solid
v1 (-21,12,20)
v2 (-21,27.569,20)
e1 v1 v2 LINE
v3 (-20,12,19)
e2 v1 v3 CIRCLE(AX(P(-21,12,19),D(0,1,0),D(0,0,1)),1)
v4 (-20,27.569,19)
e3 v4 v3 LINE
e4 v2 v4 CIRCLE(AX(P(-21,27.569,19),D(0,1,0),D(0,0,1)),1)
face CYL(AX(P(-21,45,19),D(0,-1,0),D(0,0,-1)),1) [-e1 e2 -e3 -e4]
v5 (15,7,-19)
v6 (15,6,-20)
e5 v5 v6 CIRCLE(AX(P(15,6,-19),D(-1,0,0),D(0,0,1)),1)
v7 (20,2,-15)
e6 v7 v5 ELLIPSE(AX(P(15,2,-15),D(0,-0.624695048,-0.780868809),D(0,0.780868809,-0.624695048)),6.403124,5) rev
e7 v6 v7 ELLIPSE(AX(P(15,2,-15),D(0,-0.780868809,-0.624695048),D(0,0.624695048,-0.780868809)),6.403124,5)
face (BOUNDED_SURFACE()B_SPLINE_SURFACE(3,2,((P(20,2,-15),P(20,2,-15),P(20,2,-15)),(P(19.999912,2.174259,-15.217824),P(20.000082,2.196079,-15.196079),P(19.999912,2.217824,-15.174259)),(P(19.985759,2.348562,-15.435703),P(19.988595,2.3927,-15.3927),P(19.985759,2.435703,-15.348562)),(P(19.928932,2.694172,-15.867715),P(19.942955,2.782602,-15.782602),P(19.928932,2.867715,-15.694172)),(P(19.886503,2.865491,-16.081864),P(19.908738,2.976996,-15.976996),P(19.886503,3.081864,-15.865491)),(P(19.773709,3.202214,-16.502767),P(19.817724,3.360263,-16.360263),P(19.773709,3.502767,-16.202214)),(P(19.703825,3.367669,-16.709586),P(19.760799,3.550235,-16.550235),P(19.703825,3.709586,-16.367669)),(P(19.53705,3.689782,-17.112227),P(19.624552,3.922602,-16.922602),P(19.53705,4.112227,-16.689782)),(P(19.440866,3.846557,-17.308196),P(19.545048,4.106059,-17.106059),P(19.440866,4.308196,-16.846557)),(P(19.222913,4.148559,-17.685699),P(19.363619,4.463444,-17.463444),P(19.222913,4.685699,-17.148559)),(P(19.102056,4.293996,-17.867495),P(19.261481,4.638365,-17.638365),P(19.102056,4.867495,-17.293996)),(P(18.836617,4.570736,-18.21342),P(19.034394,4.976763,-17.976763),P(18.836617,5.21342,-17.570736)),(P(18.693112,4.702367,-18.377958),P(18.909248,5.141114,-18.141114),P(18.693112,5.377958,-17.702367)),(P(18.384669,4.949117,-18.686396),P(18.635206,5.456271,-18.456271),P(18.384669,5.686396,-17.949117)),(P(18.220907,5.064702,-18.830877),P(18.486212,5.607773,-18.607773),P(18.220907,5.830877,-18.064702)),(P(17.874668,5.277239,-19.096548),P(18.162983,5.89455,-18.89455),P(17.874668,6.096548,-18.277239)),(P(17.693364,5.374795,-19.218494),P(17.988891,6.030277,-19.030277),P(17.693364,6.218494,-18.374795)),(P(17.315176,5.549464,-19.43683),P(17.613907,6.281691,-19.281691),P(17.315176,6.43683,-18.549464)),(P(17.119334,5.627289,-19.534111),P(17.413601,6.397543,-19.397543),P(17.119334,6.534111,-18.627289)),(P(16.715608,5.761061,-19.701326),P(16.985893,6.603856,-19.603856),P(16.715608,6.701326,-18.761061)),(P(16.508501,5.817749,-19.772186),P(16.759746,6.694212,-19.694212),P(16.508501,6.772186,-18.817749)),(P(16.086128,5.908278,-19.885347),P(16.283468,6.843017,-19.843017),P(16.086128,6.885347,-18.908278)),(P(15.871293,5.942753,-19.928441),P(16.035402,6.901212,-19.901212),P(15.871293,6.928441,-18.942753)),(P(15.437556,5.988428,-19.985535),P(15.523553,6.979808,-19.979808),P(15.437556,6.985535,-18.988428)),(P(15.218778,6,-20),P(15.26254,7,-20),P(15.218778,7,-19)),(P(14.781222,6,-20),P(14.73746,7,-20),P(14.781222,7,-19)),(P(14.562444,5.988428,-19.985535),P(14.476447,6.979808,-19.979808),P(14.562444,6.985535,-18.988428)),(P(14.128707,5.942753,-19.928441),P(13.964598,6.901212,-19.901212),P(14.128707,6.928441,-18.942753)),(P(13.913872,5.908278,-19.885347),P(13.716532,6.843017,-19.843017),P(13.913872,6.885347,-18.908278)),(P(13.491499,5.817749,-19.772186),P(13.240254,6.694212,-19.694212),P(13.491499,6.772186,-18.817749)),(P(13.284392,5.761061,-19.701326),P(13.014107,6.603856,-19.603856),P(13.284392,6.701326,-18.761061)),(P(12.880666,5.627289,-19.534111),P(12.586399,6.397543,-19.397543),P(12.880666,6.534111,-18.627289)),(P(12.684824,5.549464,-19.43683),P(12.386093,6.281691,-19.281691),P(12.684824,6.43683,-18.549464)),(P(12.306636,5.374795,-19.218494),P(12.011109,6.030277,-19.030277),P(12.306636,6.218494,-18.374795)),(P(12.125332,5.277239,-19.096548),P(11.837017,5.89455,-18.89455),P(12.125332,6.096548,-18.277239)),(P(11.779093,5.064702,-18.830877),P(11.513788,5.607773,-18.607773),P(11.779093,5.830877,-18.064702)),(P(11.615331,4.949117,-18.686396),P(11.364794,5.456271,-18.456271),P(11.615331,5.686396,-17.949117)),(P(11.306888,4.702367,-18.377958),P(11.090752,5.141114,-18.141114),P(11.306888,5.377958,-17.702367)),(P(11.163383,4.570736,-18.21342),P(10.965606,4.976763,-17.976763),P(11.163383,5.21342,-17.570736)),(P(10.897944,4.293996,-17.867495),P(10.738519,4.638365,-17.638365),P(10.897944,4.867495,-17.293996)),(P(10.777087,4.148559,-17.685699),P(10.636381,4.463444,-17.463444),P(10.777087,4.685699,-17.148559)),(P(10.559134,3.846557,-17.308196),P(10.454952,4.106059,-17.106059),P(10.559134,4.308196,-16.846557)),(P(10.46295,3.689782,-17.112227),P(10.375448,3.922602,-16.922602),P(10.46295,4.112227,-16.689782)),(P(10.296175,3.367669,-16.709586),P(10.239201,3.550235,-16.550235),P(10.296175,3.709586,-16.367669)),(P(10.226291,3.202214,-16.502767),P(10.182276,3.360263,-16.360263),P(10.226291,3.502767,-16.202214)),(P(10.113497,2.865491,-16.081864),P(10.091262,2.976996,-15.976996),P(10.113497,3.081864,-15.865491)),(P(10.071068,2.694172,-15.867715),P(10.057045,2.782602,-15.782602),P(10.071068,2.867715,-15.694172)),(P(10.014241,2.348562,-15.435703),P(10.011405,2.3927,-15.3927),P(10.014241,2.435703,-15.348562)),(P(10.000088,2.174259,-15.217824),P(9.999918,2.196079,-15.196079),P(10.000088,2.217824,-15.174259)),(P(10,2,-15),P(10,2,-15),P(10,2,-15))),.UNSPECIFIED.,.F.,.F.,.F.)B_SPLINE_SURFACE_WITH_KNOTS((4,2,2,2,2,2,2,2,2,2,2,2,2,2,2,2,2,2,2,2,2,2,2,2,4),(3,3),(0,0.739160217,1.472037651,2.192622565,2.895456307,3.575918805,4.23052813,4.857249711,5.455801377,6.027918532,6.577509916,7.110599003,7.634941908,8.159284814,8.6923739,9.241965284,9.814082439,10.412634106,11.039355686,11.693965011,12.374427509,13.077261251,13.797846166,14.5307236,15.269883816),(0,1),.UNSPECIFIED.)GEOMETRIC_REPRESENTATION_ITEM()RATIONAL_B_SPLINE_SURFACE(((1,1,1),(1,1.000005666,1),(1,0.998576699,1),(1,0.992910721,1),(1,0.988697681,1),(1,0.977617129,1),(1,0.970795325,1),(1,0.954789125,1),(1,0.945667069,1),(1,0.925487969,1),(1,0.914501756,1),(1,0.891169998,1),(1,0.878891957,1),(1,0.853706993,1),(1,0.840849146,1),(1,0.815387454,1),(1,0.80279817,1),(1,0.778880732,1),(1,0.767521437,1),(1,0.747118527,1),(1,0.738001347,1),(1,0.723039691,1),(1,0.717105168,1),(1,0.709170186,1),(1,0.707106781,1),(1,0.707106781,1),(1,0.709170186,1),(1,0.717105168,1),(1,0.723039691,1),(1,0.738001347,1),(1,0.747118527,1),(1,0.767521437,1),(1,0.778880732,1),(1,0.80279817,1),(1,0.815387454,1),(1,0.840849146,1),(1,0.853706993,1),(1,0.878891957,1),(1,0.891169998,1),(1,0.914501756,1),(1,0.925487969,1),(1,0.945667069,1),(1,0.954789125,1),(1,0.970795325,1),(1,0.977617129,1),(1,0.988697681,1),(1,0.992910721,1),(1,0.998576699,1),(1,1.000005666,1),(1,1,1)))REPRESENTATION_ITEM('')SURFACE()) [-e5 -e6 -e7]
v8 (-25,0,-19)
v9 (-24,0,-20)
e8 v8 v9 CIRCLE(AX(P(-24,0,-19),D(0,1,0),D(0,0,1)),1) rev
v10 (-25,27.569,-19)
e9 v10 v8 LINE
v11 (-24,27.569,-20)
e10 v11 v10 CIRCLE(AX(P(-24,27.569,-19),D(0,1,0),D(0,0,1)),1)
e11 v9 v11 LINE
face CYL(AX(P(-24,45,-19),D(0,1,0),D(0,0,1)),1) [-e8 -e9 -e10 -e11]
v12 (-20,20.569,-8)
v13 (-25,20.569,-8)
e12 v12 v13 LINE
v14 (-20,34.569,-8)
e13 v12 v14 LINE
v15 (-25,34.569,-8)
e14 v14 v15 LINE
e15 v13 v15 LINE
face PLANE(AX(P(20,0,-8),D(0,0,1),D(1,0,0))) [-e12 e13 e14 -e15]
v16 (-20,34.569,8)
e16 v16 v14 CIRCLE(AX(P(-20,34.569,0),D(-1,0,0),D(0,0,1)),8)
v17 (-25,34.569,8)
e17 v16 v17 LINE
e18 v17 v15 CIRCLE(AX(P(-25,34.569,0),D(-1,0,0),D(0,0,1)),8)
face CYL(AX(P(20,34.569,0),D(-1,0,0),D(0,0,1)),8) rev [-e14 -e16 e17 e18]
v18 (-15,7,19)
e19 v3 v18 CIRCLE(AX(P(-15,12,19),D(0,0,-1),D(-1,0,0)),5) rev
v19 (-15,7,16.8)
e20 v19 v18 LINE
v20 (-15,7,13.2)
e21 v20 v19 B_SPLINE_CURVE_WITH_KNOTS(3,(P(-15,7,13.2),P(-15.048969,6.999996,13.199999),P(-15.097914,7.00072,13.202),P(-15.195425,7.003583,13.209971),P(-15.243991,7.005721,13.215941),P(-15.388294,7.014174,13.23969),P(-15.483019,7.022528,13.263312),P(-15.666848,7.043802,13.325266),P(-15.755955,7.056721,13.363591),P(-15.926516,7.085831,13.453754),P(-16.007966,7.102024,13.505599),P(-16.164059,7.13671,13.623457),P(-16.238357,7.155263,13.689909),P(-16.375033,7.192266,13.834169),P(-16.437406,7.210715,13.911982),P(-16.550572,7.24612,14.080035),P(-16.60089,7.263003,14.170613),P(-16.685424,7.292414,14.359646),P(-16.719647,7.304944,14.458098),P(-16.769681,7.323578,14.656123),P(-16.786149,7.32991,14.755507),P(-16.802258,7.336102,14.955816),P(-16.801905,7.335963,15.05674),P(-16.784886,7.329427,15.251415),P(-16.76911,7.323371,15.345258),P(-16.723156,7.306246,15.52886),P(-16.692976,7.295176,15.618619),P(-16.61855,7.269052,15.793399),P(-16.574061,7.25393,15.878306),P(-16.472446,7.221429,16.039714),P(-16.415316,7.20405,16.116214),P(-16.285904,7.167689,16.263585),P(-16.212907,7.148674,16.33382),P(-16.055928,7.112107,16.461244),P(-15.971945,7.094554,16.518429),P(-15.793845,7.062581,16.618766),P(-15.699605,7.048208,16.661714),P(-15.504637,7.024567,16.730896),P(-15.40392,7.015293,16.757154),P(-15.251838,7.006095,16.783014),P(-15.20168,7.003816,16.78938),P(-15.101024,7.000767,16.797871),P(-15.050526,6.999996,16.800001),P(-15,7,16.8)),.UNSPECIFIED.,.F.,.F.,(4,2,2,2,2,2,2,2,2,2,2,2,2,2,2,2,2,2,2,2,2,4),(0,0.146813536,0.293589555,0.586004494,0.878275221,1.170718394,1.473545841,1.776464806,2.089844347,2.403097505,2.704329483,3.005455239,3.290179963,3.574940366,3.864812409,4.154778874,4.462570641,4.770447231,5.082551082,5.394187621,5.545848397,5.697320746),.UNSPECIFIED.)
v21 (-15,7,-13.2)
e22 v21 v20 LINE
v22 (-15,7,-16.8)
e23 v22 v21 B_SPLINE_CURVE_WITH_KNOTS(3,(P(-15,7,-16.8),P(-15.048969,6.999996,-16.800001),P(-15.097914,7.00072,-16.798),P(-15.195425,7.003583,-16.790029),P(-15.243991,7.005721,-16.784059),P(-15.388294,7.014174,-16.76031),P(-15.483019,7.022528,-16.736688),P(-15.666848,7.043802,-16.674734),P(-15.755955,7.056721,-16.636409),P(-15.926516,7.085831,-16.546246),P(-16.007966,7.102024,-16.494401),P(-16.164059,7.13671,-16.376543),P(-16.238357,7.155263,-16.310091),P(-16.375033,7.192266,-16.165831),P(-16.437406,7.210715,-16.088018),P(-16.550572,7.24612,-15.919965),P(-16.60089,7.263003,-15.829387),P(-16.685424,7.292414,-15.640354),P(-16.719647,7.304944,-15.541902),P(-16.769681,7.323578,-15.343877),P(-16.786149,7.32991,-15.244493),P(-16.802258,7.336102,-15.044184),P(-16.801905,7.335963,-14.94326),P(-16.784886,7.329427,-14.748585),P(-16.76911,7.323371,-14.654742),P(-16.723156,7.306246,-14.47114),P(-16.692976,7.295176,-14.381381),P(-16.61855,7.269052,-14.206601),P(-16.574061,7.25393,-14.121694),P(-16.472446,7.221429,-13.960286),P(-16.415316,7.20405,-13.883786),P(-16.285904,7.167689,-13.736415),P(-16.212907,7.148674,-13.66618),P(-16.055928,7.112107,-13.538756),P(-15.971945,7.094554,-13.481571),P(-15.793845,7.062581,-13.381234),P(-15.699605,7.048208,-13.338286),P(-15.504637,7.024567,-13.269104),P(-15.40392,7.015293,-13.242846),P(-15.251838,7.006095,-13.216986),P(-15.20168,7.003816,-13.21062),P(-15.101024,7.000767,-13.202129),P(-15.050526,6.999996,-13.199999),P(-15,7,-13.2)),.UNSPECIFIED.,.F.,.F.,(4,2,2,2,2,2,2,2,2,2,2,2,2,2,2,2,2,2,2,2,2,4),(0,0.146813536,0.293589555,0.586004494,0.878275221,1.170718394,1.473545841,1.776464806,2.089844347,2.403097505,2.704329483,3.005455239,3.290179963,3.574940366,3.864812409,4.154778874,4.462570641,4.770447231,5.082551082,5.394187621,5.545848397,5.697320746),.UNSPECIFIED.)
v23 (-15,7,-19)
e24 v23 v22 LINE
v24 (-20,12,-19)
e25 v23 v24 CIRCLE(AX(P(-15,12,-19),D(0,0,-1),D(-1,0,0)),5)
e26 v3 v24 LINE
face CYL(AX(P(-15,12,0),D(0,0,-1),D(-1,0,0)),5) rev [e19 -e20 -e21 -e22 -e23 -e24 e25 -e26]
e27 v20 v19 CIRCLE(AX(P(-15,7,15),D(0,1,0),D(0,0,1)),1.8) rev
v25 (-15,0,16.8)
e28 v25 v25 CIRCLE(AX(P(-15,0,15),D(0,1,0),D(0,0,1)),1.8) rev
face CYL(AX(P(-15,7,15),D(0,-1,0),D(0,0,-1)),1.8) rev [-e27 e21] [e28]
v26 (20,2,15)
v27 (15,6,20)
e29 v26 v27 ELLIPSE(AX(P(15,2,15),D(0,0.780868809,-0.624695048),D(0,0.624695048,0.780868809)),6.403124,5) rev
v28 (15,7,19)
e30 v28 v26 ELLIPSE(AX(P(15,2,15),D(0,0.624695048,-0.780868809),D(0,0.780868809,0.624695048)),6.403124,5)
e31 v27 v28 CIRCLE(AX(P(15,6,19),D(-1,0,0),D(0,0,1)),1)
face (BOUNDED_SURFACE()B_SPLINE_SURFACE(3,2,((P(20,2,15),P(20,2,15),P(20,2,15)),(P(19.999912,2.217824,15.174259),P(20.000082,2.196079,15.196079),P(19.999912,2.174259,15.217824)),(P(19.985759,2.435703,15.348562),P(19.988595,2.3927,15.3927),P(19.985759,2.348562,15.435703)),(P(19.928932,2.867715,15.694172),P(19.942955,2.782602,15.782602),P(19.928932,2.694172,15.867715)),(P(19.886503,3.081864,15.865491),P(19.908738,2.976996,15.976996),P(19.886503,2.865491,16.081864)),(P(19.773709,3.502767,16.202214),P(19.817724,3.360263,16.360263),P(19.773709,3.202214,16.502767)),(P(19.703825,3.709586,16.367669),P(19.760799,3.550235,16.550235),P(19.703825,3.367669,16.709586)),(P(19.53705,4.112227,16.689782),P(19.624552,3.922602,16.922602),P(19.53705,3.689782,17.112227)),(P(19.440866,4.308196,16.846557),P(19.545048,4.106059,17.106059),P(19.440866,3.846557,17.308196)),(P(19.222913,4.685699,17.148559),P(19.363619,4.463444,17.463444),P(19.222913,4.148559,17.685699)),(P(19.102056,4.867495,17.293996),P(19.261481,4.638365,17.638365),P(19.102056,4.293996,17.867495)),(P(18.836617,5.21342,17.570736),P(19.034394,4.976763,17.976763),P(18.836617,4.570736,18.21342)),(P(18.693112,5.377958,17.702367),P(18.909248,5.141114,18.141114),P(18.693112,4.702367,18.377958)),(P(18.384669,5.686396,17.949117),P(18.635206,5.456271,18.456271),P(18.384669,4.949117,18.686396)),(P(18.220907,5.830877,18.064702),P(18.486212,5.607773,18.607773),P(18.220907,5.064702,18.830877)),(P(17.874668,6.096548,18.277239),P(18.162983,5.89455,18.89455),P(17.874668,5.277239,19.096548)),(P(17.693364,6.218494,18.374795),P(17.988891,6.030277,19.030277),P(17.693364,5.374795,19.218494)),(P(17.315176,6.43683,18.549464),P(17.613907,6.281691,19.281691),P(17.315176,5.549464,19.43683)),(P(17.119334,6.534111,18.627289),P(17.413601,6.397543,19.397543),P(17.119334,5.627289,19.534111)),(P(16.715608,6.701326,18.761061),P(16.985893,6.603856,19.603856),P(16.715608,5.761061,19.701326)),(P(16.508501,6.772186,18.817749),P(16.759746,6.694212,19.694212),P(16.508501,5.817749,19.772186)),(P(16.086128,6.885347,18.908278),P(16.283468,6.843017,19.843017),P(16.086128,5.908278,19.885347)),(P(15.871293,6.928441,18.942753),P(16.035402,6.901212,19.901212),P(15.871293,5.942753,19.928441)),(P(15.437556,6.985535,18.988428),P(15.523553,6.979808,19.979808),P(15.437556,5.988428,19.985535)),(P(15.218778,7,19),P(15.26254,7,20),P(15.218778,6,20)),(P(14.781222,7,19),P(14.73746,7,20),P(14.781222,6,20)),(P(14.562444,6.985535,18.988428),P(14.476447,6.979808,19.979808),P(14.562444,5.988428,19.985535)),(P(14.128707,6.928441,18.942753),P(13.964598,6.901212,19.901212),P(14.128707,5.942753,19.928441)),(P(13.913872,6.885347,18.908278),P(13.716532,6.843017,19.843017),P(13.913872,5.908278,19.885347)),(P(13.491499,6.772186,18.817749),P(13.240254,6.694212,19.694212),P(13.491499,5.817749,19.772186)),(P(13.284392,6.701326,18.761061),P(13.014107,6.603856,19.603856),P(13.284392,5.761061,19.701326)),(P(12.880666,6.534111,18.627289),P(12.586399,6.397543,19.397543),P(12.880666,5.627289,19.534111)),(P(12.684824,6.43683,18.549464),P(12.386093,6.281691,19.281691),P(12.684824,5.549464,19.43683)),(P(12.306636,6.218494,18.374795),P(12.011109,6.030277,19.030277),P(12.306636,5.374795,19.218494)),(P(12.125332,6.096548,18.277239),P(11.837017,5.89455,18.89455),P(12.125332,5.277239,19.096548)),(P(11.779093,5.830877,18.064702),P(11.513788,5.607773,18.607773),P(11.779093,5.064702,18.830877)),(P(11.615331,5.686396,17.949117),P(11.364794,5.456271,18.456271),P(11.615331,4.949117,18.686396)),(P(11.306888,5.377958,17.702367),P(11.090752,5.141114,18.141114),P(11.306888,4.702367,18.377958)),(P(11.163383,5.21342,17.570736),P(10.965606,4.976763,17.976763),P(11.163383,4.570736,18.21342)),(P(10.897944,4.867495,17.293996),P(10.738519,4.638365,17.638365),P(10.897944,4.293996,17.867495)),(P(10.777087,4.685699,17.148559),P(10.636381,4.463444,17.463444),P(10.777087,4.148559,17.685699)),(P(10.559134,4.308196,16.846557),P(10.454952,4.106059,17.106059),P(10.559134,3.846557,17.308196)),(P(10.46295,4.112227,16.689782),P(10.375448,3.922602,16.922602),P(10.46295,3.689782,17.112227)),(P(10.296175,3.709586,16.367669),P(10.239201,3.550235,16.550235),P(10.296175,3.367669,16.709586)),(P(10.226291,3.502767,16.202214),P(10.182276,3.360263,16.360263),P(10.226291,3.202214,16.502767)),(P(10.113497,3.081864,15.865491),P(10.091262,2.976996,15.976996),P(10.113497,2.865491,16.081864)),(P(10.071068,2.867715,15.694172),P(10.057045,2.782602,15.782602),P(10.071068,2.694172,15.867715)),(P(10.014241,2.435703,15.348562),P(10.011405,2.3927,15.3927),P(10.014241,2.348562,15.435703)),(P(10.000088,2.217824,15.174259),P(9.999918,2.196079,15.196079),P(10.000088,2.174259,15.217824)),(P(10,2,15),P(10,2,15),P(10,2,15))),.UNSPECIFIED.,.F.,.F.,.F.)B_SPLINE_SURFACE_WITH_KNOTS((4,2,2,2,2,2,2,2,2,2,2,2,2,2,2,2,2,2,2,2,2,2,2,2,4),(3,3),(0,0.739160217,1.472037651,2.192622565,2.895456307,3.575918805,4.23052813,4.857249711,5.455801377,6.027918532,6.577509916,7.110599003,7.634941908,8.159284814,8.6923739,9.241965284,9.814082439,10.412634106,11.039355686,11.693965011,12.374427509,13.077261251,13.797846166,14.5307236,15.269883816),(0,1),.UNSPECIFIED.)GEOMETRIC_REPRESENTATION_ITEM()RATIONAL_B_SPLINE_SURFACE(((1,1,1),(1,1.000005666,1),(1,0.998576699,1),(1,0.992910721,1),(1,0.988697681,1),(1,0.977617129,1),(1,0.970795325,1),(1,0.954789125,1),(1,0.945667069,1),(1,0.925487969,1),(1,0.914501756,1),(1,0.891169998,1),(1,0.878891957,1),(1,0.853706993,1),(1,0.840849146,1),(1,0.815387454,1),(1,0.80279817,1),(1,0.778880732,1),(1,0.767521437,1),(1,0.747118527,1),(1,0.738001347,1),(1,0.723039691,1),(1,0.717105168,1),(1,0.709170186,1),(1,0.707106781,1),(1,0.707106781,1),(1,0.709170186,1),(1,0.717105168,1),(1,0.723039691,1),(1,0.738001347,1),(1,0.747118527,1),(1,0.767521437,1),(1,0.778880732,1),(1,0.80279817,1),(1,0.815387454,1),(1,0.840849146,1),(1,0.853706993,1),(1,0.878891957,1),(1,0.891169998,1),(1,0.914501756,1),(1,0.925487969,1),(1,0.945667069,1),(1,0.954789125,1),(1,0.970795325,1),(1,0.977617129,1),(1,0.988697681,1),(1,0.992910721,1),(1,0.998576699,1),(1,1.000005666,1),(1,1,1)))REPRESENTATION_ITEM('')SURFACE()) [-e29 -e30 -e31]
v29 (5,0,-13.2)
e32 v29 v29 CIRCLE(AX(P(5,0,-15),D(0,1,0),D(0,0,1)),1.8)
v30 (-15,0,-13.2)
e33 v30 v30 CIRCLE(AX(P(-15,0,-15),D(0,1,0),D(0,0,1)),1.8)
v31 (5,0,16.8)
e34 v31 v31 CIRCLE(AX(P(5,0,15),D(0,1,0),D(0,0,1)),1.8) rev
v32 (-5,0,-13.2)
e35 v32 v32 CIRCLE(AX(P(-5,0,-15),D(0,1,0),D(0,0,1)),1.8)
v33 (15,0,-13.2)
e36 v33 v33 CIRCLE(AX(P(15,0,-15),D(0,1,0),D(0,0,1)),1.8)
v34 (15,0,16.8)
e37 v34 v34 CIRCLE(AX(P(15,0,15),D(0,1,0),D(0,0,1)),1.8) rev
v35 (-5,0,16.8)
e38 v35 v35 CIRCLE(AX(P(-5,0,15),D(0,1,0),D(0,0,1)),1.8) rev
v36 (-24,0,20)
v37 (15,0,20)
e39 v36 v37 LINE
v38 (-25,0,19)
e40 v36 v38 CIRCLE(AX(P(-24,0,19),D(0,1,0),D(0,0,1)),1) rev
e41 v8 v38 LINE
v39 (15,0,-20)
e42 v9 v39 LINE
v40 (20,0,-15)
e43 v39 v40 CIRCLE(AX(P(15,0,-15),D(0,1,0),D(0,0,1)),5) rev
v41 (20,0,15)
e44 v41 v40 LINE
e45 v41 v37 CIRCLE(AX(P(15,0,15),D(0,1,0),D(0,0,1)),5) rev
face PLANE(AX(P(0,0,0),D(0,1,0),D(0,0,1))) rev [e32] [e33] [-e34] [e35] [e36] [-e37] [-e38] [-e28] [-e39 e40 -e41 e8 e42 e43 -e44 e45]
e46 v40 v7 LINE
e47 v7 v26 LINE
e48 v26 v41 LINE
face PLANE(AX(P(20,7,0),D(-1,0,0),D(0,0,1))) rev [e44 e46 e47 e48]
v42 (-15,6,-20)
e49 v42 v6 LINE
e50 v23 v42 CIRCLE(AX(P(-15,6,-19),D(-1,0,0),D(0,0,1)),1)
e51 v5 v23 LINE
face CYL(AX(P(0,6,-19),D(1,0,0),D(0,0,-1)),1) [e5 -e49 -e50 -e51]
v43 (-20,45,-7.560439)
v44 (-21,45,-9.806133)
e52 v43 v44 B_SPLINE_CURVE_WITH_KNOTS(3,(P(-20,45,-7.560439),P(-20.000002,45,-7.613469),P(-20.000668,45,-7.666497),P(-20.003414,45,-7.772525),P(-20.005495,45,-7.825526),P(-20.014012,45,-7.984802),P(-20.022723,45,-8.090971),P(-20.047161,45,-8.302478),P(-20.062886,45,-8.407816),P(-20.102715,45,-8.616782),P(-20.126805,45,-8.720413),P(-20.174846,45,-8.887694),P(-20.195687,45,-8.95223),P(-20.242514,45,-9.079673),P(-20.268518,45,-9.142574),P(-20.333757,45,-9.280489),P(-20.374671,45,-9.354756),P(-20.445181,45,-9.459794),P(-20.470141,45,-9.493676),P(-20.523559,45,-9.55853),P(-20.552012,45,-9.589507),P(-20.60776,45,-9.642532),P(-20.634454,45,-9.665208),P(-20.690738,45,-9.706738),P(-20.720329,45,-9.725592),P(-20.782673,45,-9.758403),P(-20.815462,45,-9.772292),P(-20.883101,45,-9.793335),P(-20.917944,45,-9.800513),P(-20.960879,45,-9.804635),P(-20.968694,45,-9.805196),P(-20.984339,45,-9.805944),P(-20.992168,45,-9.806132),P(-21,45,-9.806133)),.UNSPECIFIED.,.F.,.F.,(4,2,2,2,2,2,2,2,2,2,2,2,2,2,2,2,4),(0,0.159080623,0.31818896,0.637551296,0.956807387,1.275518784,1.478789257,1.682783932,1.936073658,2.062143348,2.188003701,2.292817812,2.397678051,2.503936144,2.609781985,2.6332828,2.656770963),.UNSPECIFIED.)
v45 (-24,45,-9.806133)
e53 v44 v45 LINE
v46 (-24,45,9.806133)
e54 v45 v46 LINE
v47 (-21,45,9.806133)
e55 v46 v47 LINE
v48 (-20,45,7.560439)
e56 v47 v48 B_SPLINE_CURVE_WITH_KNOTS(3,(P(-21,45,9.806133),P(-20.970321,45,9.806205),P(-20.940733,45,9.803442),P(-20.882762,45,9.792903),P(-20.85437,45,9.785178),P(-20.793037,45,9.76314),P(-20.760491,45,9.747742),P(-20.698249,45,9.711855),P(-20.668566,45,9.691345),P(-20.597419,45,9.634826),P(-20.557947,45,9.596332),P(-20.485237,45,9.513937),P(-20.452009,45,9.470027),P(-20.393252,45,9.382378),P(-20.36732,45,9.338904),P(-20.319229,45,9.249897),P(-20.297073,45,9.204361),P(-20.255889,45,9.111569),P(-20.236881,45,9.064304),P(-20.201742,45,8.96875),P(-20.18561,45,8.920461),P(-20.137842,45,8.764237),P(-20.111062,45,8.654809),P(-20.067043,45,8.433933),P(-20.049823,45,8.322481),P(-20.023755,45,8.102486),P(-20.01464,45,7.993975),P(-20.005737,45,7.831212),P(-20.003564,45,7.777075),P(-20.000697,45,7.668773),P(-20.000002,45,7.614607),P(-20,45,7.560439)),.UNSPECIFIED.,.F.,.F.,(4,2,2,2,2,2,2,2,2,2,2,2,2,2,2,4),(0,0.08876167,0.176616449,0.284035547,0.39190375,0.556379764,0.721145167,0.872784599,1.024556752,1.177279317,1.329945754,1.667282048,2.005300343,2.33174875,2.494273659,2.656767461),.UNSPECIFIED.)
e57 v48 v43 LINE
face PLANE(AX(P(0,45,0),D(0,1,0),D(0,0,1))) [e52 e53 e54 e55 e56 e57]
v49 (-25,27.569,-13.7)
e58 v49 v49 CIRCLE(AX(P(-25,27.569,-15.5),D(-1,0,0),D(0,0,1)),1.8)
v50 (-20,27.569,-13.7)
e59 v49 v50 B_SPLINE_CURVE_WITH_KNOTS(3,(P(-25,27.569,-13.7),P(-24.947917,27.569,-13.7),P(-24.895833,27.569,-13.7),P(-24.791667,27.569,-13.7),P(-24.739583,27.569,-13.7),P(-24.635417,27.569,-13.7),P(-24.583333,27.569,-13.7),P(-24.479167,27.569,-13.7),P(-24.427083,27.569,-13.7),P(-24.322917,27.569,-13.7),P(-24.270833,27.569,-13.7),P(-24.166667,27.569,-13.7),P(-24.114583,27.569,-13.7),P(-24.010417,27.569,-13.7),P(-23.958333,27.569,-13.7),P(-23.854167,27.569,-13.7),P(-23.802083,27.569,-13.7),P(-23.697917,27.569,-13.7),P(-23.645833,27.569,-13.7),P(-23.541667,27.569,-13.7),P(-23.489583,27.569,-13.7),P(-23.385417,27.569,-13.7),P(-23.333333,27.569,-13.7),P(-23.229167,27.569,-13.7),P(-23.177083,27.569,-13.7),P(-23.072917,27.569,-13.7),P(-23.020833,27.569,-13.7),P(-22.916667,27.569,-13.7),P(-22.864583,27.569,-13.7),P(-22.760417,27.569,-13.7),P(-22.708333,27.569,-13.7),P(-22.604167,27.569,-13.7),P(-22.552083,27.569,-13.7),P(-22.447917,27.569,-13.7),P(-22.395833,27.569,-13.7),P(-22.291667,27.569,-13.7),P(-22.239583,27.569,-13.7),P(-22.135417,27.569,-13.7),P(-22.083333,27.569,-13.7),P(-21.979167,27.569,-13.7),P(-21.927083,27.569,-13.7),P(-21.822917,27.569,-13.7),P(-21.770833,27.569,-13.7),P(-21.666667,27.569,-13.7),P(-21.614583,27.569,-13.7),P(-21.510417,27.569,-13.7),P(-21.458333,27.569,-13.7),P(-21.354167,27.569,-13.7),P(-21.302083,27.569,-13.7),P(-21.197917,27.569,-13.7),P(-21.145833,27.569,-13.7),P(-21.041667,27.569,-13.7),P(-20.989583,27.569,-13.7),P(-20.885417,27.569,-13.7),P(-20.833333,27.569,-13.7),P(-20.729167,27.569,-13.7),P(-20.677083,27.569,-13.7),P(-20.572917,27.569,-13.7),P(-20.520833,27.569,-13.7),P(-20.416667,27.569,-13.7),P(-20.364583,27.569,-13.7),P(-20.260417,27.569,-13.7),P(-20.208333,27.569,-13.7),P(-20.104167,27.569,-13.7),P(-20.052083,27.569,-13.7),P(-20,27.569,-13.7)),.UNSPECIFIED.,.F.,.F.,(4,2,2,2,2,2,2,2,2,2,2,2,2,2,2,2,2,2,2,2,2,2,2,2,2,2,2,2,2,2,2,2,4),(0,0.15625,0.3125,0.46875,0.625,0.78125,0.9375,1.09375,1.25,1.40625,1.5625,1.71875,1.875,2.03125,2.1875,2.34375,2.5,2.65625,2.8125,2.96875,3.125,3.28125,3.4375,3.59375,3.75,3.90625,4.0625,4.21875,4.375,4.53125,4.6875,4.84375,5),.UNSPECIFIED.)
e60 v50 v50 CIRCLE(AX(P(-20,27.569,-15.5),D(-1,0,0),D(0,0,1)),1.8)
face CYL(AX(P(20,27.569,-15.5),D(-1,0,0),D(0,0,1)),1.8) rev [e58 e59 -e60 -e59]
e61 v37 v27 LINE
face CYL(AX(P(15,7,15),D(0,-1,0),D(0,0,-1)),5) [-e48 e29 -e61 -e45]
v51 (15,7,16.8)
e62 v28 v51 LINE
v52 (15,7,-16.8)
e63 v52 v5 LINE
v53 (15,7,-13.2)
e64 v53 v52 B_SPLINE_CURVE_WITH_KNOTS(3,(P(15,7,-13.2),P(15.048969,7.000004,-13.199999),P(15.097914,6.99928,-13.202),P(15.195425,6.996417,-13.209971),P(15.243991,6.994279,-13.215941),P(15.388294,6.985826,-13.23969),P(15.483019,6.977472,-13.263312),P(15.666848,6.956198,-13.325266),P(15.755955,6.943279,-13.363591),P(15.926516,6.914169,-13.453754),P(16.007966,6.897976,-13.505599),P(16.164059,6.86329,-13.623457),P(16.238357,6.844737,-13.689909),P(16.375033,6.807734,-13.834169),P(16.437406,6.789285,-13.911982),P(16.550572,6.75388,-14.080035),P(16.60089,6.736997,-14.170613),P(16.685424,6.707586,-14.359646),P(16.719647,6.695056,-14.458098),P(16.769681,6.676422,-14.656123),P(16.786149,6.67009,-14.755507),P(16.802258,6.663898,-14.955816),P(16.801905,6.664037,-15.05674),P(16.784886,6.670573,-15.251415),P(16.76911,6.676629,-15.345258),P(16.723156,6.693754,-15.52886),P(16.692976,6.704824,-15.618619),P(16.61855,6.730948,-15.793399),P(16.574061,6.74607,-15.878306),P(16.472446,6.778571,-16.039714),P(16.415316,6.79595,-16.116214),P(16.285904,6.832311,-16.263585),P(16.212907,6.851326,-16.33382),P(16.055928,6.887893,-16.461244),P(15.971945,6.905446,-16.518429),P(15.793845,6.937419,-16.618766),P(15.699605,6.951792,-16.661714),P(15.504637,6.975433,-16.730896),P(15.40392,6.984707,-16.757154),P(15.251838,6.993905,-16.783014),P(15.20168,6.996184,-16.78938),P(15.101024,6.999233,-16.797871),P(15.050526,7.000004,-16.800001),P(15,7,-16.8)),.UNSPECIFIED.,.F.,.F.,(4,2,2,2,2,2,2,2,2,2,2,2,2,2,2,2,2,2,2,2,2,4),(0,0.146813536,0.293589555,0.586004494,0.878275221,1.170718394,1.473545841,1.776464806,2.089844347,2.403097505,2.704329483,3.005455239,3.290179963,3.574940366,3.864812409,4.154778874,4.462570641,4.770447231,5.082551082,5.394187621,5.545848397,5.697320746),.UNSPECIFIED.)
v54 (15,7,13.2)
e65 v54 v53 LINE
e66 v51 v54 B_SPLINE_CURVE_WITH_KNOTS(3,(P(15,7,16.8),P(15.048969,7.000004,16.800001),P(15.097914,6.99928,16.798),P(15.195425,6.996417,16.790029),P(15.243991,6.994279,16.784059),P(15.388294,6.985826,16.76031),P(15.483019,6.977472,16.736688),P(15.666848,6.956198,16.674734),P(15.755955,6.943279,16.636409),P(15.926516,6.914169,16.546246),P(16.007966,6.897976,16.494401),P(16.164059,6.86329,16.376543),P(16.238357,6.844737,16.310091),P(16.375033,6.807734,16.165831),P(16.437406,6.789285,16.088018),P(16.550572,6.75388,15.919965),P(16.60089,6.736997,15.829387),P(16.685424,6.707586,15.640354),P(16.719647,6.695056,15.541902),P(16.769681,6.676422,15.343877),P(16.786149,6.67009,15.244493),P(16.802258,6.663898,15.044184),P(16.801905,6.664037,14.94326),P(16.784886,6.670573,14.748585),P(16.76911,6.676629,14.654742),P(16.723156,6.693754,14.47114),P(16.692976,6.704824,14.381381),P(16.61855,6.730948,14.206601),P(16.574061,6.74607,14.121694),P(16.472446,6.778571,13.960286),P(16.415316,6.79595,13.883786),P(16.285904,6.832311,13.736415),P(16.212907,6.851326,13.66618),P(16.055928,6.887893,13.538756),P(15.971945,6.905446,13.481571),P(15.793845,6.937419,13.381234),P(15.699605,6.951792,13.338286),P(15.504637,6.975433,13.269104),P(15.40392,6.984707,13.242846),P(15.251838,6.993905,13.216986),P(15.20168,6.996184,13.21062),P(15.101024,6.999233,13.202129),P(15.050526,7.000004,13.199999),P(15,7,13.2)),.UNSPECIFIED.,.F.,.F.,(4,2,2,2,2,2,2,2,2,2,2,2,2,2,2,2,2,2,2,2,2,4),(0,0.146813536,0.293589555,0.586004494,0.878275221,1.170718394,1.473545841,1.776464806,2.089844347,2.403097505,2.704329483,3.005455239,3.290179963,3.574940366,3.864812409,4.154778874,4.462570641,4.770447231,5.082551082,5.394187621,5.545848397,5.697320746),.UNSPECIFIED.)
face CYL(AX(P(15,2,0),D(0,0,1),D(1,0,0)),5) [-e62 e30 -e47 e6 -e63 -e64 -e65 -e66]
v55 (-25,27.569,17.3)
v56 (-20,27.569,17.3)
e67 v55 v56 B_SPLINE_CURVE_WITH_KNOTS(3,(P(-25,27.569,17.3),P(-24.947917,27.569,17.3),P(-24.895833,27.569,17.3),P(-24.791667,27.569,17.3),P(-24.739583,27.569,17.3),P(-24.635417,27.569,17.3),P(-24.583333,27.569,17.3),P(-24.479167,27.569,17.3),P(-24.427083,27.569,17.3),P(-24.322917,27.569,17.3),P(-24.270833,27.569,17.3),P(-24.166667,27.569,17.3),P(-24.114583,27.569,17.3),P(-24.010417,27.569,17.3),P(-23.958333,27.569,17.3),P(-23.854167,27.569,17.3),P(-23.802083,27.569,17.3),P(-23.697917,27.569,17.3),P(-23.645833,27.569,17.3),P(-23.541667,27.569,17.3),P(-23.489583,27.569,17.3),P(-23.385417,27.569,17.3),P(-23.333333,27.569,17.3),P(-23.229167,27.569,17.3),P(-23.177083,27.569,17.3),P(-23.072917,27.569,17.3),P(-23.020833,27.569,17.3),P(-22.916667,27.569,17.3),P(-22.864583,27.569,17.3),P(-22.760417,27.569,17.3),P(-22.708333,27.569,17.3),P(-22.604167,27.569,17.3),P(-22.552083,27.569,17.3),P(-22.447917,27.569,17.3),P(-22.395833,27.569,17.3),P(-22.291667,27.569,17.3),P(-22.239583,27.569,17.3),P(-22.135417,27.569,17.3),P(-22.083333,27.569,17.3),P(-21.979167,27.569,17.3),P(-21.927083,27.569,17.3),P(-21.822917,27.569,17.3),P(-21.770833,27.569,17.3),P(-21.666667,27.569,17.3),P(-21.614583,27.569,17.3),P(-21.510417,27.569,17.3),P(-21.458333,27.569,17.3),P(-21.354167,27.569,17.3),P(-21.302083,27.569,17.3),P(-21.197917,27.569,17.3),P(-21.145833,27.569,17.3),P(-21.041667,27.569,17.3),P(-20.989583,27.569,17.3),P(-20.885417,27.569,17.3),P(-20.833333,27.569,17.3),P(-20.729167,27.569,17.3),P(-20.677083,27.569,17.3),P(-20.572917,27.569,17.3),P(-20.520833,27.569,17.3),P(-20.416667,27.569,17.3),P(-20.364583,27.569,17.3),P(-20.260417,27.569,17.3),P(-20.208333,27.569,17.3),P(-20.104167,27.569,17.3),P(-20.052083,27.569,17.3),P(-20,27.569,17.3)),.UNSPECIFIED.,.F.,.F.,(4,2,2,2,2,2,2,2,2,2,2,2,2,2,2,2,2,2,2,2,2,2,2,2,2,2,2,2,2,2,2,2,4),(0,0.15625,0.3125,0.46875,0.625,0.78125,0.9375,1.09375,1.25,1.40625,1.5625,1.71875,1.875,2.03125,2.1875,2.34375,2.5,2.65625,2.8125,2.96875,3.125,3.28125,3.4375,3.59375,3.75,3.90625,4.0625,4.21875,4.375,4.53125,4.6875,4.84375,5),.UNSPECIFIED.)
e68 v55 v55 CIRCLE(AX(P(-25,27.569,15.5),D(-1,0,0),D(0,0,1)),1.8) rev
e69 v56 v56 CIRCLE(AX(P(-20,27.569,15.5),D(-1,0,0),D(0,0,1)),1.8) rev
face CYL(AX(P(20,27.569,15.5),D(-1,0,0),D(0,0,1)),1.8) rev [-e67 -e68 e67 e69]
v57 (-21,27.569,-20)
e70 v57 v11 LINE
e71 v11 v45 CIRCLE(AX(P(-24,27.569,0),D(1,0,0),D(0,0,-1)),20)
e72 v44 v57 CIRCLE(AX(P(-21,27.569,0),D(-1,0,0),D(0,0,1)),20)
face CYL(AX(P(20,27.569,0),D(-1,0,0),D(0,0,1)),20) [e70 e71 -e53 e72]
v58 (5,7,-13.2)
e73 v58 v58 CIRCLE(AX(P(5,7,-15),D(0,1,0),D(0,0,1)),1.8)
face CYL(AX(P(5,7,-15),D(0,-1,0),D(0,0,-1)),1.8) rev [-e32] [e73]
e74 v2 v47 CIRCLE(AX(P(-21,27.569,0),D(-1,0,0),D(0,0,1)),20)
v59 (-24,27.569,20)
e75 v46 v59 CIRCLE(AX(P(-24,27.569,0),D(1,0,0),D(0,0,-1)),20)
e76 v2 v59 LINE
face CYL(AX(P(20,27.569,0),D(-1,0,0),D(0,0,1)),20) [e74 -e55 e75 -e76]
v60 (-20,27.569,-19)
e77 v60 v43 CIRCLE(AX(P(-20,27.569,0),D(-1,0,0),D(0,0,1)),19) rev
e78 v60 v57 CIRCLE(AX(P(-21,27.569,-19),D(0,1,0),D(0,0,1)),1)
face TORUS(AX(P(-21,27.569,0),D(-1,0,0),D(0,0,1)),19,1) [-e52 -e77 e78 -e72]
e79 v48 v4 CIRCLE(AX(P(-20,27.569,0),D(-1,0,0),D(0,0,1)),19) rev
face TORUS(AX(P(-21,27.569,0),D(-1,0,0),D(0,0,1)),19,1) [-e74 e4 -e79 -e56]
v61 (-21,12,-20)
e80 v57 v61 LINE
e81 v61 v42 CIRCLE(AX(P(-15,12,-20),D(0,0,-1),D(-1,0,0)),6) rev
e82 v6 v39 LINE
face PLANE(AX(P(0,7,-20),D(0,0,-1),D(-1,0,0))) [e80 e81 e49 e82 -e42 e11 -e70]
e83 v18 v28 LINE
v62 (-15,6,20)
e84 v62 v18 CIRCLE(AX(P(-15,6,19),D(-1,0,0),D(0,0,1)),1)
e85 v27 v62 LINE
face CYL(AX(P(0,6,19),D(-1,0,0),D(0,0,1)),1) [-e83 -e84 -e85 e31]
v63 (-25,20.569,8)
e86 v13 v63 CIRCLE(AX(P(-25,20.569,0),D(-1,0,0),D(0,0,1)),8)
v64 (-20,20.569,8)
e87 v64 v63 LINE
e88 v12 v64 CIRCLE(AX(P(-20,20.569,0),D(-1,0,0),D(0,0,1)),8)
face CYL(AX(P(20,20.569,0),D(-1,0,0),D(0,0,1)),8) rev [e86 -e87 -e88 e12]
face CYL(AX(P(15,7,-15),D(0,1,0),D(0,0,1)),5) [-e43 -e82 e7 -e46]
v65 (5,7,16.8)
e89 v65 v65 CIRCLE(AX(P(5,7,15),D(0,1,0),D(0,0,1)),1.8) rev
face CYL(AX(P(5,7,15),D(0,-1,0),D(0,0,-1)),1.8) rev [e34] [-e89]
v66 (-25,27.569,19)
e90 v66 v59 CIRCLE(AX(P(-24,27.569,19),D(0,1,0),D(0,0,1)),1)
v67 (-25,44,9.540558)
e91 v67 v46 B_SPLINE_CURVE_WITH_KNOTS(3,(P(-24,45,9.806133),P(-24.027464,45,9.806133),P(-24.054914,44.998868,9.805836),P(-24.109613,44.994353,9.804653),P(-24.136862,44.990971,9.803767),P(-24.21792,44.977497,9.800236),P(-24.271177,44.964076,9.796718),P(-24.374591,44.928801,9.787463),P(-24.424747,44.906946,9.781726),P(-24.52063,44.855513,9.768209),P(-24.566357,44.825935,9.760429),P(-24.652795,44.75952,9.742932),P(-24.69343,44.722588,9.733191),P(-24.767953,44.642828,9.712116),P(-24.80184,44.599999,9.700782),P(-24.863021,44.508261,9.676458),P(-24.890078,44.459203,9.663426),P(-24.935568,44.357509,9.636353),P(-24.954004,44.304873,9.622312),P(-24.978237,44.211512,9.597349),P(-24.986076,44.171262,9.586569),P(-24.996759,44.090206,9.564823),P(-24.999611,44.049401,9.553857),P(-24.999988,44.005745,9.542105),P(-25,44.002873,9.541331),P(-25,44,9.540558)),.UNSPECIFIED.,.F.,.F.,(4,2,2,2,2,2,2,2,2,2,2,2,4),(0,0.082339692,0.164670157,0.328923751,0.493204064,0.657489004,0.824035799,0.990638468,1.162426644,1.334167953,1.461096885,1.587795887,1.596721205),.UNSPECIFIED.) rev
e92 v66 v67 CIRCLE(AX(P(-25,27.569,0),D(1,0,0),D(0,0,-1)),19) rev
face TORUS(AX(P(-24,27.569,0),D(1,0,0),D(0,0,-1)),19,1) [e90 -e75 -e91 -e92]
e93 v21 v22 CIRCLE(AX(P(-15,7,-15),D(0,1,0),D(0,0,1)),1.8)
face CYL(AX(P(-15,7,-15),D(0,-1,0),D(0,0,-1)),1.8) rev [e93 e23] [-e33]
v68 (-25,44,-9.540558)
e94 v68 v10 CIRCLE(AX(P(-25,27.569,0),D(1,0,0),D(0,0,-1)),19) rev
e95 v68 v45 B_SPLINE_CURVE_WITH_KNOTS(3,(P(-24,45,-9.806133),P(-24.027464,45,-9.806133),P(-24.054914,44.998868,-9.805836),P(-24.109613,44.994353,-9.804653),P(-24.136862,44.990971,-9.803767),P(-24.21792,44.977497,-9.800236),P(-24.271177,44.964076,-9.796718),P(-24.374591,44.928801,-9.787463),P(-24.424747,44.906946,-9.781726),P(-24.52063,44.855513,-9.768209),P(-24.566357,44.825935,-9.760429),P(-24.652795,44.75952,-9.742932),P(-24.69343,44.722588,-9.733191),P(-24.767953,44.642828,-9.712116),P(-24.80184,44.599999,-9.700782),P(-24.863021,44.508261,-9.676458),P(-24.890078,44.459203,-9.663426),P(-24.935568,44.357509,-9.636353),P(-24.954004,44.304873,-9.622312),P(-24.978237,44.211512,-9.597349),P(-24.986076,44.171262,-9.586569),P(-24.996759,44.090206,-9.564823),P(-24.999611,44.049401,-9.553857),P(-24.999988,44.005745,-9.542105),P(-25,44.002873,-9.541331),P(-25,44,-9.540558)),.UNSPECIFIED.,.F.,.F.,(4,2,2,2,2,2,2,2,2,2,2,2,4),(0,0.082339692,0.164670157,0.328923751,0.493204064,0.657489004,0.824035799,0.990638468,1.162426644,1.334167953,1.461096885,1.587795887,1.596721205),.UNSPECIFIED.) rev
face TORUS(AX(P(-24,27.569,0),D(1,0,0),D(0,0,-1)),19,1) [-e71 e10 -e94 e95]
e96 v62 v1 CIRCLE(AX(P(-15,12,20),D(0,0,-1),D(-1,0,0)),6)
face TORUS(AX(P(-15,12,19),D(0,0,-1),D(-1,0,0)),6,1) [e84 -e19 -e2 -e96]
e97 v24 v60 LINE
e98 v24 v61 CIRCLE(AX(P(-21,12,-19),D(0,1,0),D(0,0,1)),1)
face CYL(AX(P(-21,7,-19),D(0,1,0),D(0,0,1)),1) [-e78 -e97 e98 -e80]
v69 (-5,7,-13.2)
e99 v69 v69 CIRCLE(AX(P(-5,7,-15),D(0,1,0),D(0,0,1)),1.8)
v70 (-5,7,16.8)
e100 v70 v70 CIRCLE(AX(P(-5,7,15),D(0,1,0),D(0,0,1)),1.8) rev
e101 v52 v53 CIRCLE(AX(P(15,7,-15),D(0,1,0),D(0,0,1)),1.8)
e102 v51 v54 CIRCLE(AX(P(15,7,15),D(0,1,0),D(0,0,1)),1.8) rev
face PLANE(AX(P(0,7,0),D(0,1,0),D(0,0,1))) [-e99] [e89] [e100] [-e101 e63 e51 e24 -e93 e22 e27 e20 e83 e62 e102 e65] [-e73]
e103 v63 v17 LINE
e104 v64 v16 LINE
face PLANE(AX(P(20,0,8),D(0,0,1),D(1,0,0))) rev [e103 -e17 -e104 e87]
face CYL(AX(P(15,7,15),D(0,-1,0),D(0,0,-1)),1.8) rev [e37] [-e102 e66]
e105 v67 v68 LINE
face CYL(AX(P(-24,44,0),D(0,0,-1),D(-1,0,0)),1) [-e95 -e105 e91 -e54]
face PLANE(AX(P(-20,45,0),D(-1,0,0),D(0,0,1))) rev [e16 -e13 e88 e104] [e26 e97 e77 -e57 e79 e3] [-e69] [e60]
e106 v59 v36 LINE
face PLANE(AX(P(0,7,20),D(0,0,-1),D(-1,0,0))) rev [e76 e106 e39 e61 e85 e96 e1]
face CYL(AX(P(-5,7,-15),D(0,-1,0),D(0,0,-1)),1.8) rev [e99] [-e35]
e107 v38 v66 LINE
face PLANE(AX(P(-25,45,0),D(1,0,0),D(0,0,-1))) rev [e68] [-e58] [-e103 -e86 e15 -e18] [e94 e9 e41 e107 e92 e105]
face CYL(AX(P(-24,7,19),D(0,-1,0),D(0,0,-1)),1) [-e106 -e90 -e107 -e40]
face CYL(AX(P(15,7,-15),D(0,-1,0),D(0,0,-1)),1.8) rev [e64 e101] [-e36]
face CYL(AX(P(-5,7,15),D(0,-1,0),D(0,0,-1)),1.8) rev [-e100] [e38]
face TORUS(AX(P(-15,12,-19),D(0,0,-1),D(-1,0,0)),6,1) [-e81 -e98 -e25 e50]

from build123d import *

# Parameters (mm, degrees)
SKETCH1_W           = 40
SKETCH1_H           = 40
SKETCH1_R           = 1.8
BOSS_EXTRUDE1_DEPTH = 7
SKETCH1_3_W         = 5
SKETCH1_3_H         = 40
BOSS_EXTRUDE2_DEPTH = 45
SKETCH2_R           = 1.8
CUT_EXTRUDE1_DEPTH  = 67.708320321
SKETCH2_4_OUTSIDE_W = 57.034
SKETCH2_4_OUTSIDE_H = 62.034
SKETCH2_4_OUTSIDE_R = 1.8
CUT_EXTRUDE2_DEPTH  = 67.708320321
FILLET1_R           = 5
FILLET2_R           = 5
FILLET3_R           = 1


with BuildPart() as part:
    # Sketch1 → Boss-Extrude1 (new body)
    with BuildSketch(Plane(origin=(0, 0, 0), x_dir=(1, 0, 0), z_dir=(0, 1, 0))):
        Rectangle(SKETCH1_W, SKETCH1_H)
        with Locations(Location((-5, -15, 0), (0, 0, 270))):
            Circle(SKETCH1_R, mode=Mode.SUBTRACT)
        with Locations(Location((15, -15, 0), (0, 0, 270))):
            Circle(SKETCH1_R, mode=Mode.SUBTRACT)
        with Locations(Location((-15, 15, 0), (0, 0, 270))):
            Circle(SKETCH1_R, mode=Mode.SUBTRACT)
        with Locations(Location((-5, 15, 0), (0, 0, 270))):
            Circle(SKETCH1_R, mode=Mode.SUBTRACT)
        with Locations(Location((5, 15, 0), (0, 0, 270))):
            Circle(SKETCH1_R, mode=Mode.SUBTRACT)
        with Locations(Location((15, 15, 0), (0, 0, 270))):
            Circle(SKETCH1_R, mode=Mode.SUBTRACT)
        with Locations(Location((5, -15, 0), (0, 0, 270))):
            Circle(SKETCH1_R, mode=Mode.SUBTRACT)
        with Locations(Location((-15, -15, 0), (0, 0, 270))):
            Circle(SKETCH1_R, mode=Mode.SUBTRACT)
    extrude(amount=BOSS_EXTRUDE1_DEPTH)

    # Sketch1<3> → Boss-Extrude2 (add)
    with BuildSketch(Plane(origin=(0, 0, 0), x_dir=(1, 0, 0), z_dir=(0, 1, 0))):
        with Locations((-22.5, 0)):
            Rectangle(SKETCH1_3_W, SKETCH1_3_H)
    extrude(amount=BOSS_EXTRUDE2_DEPTH)

    # Sketch2 → Cut-Extrude1 (cut, through all)
    with BuildSketch(Plane.ZY.offset(25)):
        with Locations((-15.5, 27.569)):
            Circle(SKETCH2_R)
        with BuildLine():
            Line((8, 20.569), (8, 34.569))
            ThreePointArc((8, 34.569), (0, 42.569), (-8, 34.569))
            Line((-8, 34.569), (-8, 20.569))
            ThreePointArc((-8, 20.569), (0, 12.569), (8, 20.569))
        make_face()
        with Locations((15.5, 27.569)):
            Circle(SKETCH2_R)
    extrude(amount=-CUT_EXTRUDE1_DEPTH, mode=Mode.SUBTRACT)

    # Sketch2<4> outside → Cut-Extrude2 (cut, through all)
    # profile 1 of 4: a face of its own
    with BuildSketch(Plane.ZY.offset(25)):
        with Locations((0, 22.5)):
            Rectangle(SKETCH2_4_OUTSIDE_W, SKETCH2_4_OUTSIDE_H)
        with BuildLine():
            Line((-20, 27.569), (-20, 0))
            Line((-20, 0), (20, 0))
            Line((20, 0), (20, 27.569))
            ThreePointArc((20, 27.569), (0, 47.569), (-20, 27.569))
        make_face(mode=Mode.SUBTRACT)
    # profile 2 of 4: a face of its own
    with BuildSketch(Plane.ZY.offset(25)):
        with Locations((-15.5, 27.569)):
            Circle(SKETCH2_4_OUTSIDE_R)
    # profile 3 of 4: a face of its own
    with BuildSketch(Plane.ZY.offset(25)):
        with Locations((15.5, 27.569)):
            Circle(SKETCH2_4_OUTSIDE_R)
    # profile 4 of 4: a face of its own
    with BuildSketch(Plane.ZY.offset(25)):
        with BuildLine():
            Line((-8, 20.569), (-8, 34.569))
            ThreePointArc((-8, 34.569), (0, 42.569), (8, 34.569))
            Line((8, 34.569), (8, 20.569))
            ThreePointArc((8, 20.569), (0, 12.569), (-8, 20.569))
        make_face()
    extrude(amount=-CUT_EXTRUDE2_DEPTH, mode=Mode.SUBTRACT)

    # Fillet1
    # the kernel refuses this fillet: 5 mm, written as the material it adds along each edge
    with BuildSketch(Plane(origin=(-20, 7, -20), x_dir=(1, 0, 0), z_dir=(0, 0, 1))) as fillet1_piece_1_section:
        with BuildLine():
            CenterArc((FILLET1_R, FILLET1_R), FILLET1_R, 180, 90)
            Line((0, FILLET1_R), (0, 0))
            Line((0, 0), (FILLET1_R, 0))
        make_face()
    fillet1_piece_1 = extrude(amount=40, mode=Mode.PRIVATE)
    fillet1_piece_1 = fillet1_piece_1 - Plane(origin=(-15, 8.140202128, -15), x_dir=(0, 0, 1), z_dir=(0, -1, 0)) * Cylinder(1.8, 100, mode=Mode.PRIVATE)
    fillet1_piece_1 = fillet1_piece_1 - Plane(origin=(-15, 8.140202128, 15), x_dir=(0, 0, 1), z_dir=(0, -1, 0)) * Cylinder(1.8, 100, mode=Mode.PRIVATE)
    add(fillet1_piece_1)

    # Fillet2
    # the kernel refuses this fillet: 5 mm, written as the material it takes off along each edge
    with BuildSketch(Plane(origin=(20, -12.5, -20), x_dir=(-1, 0, 0), z_dir=(0, 1, 0)), Plane(origin=(20, -12.5, 20), x_dir=(0, 0, -1), z_dir=(0, 1, 0))) as fillet2_piece_1:
        with BuildLine():
            CenterArc((FILLET2_R, FILLET2_R), FILLET2_R, 180, 90)
            Line((0, FILLET2_R), (0, 0))
            Line((0, 0), (FILLET2_R, 0))
        make_face()
    extrude(amount=32, mode=Mode.SUBTRACT)
    with BuildSketch(Plane(origin=(20, 7, 32.5), x_dir=(-1, 0, 0), z_dir=(0, 0, -1))) as fillet2_piece_2:
        with BuildLine():
            CenterArc((FILLET2_R, -FILLET2_R), FILLET2_R, 90, 90)
            Line((0, -FILLET2_R), (0, 0))
            Line((0, 0), (FILLET2_R, 0))
        make_face()
    extrude(amount=65, mode=Mode.SUBTRACT)

    # Fillet3
    fillet3_edges = [part.edges().sort_by_distance(p)[0] for p in [
        (-20, 37.665468331, -17.264452706),
        (-20, 37.665468331, 17.264452706),
        (0, 7, 20),
        (0, 7, -20),
        (-18.535533906, 8.464466094, -20),
        (-18.535533906, 8.464466094, 20),
        (18.816480084, 5.230244537, 18.230244537),
        (18.816480084, 5.230244537, -18.230244537),
        (-25, 45, 0),
        (-25, 13.7845, -20),
        (-20, 19.7845, -20),
        (-20, 19.7845, 20),
        (-25, 13.7845, 20),
        (-25, 37.665468331, -17.264452706),
        (-25, 37.665468331, 17.264452706),
    ]]
    fillet(fillet3_edges, radius=FILLET3_R)


solid = part.part
